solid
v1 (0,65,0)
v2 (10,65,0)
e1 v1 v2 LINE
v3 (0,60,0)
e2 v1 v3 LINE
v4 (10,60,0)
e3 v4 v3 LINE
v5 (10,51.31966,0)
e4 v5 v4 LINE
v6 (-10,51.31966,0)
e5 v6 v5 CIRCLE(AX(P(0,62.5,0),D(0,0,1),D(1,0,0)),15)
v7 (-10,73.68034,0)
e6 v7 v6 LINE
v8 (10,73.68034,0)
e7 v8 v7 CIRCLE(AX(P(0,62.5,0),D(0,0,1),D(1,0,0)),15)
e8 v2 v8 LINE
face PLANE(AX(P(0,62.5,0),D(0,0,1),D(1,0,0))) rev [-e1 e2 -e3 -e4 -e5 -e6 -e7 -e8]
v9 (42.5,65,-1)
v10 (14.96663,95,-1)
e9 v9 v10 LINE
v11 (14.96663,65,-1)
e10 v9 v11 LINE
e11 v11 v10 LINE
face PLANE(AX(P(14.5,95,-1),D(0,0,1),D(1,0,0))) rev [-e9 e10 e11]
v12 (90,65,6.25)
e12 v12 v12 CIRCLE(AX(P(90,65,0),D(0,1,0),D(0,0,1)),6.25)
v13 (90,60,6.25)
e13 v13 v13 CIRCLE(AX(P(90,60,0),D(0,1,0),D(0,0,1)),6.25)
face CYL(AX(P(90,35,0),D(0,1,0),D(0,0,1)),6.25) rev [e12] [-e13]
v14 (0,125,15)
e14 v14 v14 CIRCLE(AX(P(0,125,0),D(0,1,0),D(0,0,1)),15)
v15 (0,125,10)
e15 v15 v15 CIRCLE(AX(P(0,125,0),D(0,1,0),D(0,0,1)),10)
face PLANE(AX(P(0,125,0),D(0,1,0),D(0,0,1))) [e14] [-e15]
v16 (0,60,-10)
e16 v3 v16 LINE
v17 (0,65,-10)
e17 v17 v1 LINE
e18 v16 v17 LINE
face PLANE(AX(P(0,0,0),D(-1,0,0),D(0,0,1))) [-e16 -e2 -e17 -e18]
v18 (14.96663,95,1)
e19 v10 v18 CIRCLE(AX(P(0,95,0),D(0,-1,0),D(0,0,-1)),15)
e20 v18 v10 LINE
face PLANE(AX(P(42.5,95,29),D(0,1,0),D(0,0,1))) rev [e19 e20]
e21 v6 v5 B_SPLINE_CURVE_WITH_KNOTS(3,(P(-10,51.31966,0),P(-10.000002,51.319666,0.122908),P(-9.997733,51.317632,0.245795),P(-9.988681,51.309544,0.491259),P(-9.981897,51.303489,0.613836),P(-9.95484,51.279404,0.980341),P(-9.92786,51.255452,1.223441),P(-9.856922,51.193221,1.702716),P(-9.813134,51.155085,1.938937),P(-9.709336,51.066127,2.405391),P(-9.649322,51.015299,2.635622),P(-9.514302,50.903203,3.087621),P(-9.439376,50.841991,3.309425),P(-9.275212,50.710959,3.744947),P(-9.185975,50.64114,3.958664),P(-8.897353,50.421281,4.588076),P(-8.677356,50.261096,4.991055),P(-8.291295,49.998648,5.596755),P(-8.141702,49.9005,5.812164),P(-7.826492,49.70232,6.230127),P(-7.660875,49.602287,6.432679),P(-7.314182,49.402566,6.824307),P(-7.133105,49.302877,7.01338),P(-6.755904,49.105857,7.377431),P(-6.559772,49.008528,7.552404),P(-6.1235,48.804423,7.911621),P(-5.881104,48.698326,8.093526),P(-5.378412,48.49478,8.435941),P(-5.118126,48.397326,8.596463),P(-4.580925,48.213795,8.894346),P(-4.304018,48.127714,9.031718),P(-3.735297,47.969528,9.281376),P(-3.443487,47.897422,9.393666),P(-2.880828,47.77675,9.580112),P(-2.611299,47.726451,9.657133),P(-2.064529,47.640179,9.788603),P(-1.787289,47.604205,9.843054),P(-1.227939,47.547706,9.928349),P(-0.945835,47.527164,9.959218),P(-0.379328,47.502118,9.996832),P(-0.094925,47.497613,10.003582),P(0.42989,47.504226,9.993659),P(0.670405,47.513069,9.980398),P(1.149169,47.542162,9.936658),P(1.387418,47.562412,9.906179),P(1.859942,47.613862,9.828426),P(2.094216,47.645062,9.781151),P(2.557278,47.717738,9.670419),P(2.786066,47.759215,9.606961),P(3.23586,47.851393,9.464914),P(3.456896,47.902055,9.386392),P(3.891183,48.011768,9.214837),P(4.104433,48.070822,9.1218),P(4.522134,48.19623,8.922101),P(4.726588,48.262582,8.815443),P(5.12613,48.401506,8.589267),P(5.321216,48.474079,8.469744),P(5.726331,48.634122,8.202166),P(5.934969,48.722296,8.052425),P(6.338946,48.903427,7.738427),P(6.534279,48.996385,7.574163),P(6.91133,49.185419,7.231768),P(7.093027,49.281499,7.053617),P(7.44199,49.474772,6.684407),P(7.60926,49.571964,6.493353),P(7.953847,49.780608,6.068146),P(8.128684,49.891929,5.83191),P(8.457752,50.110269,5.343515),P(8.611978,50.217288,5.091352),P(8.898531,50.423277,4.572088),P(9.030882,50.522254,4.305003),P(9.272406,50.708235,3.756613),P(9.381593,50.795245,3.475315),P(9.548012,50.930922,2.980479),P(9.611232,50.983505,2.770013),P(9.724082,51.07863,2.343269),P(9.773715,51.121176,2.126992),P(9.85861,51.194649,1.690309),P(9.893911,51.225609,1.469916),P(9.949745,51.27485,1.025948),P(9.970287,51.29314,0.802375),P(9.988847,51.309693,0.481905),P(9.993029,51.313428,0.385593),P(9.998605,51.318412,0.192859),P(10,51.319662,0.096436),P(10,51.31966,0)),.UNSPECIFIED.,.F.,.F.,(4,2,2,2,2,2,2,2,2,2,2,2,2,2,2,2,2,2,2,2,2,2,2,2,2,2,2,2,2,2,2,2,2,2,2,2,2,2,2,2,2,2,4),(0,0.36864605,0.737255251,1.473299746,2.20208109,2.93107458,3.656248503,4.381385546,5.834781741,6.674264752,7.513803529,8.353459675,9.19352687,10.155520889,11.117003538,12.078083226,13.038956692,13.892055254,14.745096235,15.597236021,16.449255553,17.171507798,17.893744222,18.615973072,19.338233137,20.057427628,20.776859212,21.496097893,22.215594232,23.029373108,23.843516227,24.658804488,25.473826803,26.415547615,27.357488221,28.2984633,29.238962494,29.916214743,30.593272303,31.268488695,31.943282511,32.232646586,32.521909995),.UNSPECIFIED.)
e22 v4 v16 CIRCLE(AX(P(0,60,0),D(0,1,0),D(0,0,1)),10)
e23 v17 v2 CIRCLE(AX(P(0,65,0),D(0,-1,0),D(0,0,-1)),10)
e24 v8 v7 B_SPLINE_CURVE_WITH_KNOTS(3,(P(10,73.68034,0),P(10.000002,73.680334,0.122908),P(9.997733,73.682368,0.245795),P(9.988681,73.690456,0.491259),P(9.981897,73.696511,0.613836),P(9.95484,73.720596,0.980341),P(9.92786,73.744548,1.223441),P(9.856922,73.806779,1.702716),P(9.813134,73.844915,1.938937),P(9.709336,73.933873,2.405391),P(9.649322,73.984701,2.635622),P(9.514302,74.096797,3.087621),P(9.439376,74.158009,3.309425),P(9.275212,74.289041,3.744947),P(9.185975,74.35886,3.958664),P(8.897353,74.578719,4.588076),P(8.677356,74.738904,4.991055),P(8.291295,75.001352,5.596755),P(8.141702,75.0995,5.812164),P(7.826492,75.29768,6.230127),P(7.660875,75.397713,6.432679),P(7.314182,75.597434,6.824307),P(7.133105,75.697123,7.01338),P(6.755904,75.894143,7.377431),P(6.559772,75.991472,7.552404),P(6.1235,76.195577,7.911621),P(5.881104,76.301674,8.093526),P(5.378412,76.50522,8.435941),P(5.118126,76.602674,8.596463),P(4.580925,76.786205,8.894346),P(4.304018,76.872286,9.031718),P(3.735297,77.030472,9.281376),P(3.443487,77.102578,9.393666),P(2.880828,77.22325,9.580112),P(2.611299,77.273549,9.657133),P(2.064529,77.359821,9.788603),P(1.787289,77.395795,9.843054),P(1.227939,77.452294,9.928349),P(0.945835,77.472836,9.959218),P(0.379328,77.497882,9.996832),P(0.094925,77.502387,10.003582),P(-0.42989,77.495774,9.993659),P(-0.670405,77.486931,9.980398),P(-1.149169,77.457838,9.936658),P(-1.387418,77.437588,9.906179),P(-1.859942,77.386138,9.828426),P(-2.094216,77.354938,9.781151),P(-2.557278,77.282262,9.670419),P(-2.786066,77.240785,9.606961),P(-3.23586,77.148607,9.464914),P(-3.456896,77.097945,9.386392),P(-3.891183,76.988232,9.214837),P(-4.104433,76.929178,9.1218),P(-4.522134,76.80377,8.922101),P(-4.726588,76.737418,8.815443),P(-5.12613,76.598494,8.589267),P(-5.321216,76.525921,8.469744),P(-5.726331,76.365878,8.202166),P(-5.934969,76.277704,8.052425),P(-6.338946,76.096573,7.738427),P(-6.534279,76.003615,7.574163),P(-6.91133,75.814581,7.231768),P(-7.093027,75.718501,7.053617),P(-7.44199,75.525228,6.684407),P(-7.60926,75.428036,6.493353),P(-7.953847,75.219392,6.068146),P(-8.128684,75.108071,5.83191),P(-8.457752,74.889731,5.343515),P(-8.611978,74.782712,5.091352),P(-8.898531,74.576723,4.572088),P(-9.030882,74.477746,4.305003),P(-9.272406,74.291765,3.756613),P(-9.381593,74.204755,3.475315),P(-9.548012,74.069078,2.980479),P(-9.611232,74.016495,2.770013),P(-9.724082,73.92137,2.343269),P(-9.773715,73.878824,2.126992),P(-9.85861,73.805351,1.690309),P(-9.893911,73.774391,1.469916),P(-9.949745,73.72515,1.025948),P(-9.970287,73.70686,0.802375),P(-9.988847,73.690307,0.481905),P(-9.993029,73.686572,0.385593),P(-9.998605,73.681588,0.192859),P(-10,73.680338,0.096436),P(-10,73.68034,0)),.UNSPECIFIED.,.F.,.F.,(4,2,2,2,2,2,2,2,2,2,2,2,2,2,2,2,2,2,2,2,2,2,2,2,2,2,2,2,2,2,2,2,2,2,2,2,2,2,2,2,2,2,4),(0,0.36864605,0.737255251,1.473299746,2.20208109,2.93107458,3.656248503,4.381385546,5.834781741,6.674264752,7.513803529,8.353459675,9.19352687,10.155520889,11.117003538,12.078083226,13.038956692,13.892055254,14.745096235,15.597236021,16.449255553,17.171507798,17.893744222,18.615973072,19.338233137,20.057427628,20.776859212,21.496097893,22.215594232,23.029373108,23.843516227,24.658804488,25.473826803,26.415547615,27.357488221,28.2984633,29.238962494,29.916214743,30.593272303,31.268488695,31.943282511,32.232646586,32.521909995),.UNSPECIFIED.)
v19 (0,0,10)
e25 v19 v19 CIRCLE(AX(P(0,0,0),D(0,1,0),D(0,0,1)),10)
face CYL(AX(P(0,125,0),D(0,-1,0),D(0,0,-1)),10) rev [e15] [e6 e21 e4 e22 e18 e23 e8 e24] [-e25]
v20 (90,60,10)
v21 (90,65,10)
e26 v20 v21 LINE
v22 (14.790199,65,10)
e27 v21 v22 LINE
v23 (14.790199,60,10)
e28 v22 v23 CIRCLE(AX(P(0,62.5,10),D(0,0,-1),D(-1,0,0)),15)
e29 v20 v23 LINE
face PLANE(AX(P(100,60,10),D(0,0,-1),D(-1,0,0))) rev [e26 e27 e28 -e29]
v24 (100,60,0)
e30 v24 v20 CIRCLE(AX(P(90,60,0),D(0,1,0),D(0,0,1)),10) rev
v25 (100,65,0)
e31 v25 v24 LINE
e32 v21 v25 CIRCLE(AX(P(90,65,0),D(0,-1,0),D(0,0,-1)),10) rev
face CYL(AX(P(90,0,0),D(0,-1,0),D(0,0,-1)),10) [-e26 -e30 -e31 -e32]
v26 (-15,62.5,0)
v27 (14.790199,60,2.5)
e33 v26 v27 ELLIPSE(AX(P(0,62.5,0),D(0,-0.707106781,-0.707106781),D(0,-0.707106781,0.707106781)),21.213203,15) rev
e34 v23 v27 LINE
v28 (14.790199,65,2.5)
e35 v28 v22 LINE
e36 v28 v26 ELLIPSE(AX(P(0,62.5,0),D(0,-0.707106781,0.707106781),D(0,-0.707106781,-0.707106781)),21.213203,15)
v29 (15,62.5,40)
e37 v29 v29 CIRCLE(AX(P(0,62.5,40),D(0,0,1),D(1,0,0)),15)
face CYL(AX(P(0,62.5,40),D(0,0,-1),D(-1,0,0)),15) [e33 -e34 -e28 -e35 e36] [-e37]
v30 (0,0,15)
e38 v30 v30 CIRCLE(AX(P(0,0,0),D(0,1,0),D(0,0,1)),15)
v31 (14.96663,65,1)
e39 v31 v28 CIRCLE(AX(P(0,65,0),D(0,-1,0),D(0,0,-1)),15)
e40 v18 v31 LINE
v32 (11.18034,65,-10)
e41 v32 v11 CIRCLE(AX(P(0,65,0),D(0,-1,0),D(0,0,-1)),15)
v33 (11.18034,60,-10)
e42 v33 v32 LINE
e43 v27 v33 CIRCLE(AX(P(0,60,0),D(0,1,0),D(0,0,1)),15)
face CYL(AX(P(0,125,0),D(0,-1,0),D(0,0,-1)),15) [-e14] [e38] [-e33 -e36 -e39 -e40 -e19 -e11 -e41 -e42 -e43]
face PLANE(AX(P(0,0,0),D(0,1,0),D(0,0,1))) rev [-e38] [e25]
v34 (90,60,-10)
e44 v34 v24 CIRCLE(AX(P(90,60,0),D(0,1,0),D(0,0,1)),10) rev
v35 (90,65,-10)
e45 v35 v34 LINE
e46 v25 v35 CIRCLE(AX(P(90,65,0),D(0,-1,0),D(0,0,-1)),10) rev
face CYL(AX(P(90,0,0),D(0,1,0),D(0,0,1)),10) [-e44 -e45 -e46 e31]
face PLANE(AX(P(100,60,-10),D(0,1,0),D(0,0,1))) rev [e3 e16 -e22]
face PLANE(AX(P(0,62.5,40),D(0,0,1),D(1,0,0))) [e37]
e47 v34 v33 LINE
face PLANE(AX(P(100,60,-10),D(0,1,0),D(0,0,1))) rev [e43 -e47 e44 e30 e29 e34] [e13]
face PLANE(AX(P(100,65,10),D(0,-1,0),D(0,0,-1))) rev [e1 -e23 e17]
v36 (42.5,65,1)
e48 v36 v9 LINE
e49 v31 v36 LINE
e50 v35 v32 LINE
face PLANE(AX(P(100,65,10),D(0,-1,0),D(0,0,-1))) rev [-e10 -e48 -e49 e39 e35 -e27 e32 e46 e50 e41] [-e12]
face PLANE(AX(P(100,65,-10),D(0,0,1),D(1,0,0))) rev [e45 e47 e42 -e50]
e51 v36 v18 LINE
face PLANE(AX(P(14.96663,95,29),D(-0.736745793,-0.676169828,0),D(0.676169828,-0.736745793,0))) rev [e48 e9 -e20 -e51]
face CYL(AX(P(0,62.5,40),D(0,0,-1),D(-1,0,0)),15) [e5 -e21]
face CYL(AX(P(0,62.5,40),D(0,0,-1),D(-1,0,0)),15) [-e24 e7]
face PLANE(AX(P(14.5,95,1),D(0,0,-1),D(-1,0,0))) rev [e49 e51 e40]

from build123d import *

# Parameters (mm, degrees)
SKETCH1_R           = 15
SKETCH1_R_2         = 10
BOSS_EXTRUDE1_DEPTH = 125
SKETCH2_R           = 15
BOSS_EXTRUDE2_DEPTH = 40
SKETCH6_W           = 20
SKETCH6_H           = 5
BOSS_EXTRUDE6_DEPTH = 100
FILLET1_R           = 10
SKETCH8_W           = 28
SKETCH8_H           = 2
BOSS_EXTRUDE7_DEPTH = 30
CUT_EXTRUDE1_DEPTH  = 30
SKETCH10_R          = 6.25
CUT_EXTRUDE2_DEPTH  = 30


with BuildPart() as part:
    # Sketch1 → Boss-Extrude1 (new body)
    with BuildSketch(Plane(origin=(0, 0, 0), x_dir=(1, 0, 0), z_dir=(0, 1, 0))):
        with Locations(Location((0, 0, 0), (0, 0, 270))):
            Circle(SKETCH1_R)
        with Locations(Location((0, 0, 0), (0, 0, 270))):
            Circle(SKETCH1_R_2, mode=Mode.SUBTRACT)
    extrude(amount=BOSS_EXTRUDE1_DEPTH)

    # Sketch2 → Boss-Extrude2 (add)
    with BuildSketch(Plane.XY):
        with Locations((0, 62.5)):
            Circle(SKETCH2_R)
    extrude(amount=BOSS_EXTRUDE2_DEPTH)

    # Sketch6 → Boss-Extrude6 (add)
    with BuildSketch(Plane(origin=(0, 0, 0), x_dir=(0, 0, -1), z_dir=(1, 0, 0))):
        with Locations((0, 62.5)):
            Rectangle(SKETCH6_W, SKETCH6_H)
    extrude(amount=BOSS_EXTRUDE6_DEPTH)

    # Fillet1
    fillet1_edges = [part.edges().sort_by_distance(p)[0] for p in [
        (100, 62.5, -10),
        (100, 62.5, 10),
    ]]
    fillet(fillet1_edges, radius=FILLET1_R - 0.0001)  # a hair under: the kernel refuses the full size

    # Sketch8 → Boss-Extrude7 (add)
    with BuildSketch(Plane(origin=(0, 65, 0), x_dir=(1, 0, 0), z_dir=(0, 1, 0))):
        with Locations((28.5, 0)):
            Rectangle(SKETCH8_W, SKETCH8_H)
    extrude(amount=BOSS_EXTRUDE7_DEPTH)

    # Sketch9 → Cut-Extrude1 (cut)
    with BuildSketch(Plane(origin=(0, 0, -1), x_dir=(-1, 0, 0), z_dir=(0, 0, -1))):
        Polygon((-14.966629547, 95), (-42.5, 65), (-42.5, 95), align=None)
    extrude(amount=-CUT_EXTRUDE1_DEPTH, mode=Mode.SUBTRACT)

    # Sketch10 → Cut-Extrude2 (cut)
    with BuildSketch(Plane(origin=(0, 65, 0), x_dir=(1, 0, 0), z_dir=(0, 1, 0))):
        with Locations(Location((90, 0, 0), (0, 0, 270))):
            Circle(SKETCH10_R)
    extrude(amount=-CUT_EXTRUDE2_DEPTH, mode=Mode.SUBTRACT)


solid = part.part
